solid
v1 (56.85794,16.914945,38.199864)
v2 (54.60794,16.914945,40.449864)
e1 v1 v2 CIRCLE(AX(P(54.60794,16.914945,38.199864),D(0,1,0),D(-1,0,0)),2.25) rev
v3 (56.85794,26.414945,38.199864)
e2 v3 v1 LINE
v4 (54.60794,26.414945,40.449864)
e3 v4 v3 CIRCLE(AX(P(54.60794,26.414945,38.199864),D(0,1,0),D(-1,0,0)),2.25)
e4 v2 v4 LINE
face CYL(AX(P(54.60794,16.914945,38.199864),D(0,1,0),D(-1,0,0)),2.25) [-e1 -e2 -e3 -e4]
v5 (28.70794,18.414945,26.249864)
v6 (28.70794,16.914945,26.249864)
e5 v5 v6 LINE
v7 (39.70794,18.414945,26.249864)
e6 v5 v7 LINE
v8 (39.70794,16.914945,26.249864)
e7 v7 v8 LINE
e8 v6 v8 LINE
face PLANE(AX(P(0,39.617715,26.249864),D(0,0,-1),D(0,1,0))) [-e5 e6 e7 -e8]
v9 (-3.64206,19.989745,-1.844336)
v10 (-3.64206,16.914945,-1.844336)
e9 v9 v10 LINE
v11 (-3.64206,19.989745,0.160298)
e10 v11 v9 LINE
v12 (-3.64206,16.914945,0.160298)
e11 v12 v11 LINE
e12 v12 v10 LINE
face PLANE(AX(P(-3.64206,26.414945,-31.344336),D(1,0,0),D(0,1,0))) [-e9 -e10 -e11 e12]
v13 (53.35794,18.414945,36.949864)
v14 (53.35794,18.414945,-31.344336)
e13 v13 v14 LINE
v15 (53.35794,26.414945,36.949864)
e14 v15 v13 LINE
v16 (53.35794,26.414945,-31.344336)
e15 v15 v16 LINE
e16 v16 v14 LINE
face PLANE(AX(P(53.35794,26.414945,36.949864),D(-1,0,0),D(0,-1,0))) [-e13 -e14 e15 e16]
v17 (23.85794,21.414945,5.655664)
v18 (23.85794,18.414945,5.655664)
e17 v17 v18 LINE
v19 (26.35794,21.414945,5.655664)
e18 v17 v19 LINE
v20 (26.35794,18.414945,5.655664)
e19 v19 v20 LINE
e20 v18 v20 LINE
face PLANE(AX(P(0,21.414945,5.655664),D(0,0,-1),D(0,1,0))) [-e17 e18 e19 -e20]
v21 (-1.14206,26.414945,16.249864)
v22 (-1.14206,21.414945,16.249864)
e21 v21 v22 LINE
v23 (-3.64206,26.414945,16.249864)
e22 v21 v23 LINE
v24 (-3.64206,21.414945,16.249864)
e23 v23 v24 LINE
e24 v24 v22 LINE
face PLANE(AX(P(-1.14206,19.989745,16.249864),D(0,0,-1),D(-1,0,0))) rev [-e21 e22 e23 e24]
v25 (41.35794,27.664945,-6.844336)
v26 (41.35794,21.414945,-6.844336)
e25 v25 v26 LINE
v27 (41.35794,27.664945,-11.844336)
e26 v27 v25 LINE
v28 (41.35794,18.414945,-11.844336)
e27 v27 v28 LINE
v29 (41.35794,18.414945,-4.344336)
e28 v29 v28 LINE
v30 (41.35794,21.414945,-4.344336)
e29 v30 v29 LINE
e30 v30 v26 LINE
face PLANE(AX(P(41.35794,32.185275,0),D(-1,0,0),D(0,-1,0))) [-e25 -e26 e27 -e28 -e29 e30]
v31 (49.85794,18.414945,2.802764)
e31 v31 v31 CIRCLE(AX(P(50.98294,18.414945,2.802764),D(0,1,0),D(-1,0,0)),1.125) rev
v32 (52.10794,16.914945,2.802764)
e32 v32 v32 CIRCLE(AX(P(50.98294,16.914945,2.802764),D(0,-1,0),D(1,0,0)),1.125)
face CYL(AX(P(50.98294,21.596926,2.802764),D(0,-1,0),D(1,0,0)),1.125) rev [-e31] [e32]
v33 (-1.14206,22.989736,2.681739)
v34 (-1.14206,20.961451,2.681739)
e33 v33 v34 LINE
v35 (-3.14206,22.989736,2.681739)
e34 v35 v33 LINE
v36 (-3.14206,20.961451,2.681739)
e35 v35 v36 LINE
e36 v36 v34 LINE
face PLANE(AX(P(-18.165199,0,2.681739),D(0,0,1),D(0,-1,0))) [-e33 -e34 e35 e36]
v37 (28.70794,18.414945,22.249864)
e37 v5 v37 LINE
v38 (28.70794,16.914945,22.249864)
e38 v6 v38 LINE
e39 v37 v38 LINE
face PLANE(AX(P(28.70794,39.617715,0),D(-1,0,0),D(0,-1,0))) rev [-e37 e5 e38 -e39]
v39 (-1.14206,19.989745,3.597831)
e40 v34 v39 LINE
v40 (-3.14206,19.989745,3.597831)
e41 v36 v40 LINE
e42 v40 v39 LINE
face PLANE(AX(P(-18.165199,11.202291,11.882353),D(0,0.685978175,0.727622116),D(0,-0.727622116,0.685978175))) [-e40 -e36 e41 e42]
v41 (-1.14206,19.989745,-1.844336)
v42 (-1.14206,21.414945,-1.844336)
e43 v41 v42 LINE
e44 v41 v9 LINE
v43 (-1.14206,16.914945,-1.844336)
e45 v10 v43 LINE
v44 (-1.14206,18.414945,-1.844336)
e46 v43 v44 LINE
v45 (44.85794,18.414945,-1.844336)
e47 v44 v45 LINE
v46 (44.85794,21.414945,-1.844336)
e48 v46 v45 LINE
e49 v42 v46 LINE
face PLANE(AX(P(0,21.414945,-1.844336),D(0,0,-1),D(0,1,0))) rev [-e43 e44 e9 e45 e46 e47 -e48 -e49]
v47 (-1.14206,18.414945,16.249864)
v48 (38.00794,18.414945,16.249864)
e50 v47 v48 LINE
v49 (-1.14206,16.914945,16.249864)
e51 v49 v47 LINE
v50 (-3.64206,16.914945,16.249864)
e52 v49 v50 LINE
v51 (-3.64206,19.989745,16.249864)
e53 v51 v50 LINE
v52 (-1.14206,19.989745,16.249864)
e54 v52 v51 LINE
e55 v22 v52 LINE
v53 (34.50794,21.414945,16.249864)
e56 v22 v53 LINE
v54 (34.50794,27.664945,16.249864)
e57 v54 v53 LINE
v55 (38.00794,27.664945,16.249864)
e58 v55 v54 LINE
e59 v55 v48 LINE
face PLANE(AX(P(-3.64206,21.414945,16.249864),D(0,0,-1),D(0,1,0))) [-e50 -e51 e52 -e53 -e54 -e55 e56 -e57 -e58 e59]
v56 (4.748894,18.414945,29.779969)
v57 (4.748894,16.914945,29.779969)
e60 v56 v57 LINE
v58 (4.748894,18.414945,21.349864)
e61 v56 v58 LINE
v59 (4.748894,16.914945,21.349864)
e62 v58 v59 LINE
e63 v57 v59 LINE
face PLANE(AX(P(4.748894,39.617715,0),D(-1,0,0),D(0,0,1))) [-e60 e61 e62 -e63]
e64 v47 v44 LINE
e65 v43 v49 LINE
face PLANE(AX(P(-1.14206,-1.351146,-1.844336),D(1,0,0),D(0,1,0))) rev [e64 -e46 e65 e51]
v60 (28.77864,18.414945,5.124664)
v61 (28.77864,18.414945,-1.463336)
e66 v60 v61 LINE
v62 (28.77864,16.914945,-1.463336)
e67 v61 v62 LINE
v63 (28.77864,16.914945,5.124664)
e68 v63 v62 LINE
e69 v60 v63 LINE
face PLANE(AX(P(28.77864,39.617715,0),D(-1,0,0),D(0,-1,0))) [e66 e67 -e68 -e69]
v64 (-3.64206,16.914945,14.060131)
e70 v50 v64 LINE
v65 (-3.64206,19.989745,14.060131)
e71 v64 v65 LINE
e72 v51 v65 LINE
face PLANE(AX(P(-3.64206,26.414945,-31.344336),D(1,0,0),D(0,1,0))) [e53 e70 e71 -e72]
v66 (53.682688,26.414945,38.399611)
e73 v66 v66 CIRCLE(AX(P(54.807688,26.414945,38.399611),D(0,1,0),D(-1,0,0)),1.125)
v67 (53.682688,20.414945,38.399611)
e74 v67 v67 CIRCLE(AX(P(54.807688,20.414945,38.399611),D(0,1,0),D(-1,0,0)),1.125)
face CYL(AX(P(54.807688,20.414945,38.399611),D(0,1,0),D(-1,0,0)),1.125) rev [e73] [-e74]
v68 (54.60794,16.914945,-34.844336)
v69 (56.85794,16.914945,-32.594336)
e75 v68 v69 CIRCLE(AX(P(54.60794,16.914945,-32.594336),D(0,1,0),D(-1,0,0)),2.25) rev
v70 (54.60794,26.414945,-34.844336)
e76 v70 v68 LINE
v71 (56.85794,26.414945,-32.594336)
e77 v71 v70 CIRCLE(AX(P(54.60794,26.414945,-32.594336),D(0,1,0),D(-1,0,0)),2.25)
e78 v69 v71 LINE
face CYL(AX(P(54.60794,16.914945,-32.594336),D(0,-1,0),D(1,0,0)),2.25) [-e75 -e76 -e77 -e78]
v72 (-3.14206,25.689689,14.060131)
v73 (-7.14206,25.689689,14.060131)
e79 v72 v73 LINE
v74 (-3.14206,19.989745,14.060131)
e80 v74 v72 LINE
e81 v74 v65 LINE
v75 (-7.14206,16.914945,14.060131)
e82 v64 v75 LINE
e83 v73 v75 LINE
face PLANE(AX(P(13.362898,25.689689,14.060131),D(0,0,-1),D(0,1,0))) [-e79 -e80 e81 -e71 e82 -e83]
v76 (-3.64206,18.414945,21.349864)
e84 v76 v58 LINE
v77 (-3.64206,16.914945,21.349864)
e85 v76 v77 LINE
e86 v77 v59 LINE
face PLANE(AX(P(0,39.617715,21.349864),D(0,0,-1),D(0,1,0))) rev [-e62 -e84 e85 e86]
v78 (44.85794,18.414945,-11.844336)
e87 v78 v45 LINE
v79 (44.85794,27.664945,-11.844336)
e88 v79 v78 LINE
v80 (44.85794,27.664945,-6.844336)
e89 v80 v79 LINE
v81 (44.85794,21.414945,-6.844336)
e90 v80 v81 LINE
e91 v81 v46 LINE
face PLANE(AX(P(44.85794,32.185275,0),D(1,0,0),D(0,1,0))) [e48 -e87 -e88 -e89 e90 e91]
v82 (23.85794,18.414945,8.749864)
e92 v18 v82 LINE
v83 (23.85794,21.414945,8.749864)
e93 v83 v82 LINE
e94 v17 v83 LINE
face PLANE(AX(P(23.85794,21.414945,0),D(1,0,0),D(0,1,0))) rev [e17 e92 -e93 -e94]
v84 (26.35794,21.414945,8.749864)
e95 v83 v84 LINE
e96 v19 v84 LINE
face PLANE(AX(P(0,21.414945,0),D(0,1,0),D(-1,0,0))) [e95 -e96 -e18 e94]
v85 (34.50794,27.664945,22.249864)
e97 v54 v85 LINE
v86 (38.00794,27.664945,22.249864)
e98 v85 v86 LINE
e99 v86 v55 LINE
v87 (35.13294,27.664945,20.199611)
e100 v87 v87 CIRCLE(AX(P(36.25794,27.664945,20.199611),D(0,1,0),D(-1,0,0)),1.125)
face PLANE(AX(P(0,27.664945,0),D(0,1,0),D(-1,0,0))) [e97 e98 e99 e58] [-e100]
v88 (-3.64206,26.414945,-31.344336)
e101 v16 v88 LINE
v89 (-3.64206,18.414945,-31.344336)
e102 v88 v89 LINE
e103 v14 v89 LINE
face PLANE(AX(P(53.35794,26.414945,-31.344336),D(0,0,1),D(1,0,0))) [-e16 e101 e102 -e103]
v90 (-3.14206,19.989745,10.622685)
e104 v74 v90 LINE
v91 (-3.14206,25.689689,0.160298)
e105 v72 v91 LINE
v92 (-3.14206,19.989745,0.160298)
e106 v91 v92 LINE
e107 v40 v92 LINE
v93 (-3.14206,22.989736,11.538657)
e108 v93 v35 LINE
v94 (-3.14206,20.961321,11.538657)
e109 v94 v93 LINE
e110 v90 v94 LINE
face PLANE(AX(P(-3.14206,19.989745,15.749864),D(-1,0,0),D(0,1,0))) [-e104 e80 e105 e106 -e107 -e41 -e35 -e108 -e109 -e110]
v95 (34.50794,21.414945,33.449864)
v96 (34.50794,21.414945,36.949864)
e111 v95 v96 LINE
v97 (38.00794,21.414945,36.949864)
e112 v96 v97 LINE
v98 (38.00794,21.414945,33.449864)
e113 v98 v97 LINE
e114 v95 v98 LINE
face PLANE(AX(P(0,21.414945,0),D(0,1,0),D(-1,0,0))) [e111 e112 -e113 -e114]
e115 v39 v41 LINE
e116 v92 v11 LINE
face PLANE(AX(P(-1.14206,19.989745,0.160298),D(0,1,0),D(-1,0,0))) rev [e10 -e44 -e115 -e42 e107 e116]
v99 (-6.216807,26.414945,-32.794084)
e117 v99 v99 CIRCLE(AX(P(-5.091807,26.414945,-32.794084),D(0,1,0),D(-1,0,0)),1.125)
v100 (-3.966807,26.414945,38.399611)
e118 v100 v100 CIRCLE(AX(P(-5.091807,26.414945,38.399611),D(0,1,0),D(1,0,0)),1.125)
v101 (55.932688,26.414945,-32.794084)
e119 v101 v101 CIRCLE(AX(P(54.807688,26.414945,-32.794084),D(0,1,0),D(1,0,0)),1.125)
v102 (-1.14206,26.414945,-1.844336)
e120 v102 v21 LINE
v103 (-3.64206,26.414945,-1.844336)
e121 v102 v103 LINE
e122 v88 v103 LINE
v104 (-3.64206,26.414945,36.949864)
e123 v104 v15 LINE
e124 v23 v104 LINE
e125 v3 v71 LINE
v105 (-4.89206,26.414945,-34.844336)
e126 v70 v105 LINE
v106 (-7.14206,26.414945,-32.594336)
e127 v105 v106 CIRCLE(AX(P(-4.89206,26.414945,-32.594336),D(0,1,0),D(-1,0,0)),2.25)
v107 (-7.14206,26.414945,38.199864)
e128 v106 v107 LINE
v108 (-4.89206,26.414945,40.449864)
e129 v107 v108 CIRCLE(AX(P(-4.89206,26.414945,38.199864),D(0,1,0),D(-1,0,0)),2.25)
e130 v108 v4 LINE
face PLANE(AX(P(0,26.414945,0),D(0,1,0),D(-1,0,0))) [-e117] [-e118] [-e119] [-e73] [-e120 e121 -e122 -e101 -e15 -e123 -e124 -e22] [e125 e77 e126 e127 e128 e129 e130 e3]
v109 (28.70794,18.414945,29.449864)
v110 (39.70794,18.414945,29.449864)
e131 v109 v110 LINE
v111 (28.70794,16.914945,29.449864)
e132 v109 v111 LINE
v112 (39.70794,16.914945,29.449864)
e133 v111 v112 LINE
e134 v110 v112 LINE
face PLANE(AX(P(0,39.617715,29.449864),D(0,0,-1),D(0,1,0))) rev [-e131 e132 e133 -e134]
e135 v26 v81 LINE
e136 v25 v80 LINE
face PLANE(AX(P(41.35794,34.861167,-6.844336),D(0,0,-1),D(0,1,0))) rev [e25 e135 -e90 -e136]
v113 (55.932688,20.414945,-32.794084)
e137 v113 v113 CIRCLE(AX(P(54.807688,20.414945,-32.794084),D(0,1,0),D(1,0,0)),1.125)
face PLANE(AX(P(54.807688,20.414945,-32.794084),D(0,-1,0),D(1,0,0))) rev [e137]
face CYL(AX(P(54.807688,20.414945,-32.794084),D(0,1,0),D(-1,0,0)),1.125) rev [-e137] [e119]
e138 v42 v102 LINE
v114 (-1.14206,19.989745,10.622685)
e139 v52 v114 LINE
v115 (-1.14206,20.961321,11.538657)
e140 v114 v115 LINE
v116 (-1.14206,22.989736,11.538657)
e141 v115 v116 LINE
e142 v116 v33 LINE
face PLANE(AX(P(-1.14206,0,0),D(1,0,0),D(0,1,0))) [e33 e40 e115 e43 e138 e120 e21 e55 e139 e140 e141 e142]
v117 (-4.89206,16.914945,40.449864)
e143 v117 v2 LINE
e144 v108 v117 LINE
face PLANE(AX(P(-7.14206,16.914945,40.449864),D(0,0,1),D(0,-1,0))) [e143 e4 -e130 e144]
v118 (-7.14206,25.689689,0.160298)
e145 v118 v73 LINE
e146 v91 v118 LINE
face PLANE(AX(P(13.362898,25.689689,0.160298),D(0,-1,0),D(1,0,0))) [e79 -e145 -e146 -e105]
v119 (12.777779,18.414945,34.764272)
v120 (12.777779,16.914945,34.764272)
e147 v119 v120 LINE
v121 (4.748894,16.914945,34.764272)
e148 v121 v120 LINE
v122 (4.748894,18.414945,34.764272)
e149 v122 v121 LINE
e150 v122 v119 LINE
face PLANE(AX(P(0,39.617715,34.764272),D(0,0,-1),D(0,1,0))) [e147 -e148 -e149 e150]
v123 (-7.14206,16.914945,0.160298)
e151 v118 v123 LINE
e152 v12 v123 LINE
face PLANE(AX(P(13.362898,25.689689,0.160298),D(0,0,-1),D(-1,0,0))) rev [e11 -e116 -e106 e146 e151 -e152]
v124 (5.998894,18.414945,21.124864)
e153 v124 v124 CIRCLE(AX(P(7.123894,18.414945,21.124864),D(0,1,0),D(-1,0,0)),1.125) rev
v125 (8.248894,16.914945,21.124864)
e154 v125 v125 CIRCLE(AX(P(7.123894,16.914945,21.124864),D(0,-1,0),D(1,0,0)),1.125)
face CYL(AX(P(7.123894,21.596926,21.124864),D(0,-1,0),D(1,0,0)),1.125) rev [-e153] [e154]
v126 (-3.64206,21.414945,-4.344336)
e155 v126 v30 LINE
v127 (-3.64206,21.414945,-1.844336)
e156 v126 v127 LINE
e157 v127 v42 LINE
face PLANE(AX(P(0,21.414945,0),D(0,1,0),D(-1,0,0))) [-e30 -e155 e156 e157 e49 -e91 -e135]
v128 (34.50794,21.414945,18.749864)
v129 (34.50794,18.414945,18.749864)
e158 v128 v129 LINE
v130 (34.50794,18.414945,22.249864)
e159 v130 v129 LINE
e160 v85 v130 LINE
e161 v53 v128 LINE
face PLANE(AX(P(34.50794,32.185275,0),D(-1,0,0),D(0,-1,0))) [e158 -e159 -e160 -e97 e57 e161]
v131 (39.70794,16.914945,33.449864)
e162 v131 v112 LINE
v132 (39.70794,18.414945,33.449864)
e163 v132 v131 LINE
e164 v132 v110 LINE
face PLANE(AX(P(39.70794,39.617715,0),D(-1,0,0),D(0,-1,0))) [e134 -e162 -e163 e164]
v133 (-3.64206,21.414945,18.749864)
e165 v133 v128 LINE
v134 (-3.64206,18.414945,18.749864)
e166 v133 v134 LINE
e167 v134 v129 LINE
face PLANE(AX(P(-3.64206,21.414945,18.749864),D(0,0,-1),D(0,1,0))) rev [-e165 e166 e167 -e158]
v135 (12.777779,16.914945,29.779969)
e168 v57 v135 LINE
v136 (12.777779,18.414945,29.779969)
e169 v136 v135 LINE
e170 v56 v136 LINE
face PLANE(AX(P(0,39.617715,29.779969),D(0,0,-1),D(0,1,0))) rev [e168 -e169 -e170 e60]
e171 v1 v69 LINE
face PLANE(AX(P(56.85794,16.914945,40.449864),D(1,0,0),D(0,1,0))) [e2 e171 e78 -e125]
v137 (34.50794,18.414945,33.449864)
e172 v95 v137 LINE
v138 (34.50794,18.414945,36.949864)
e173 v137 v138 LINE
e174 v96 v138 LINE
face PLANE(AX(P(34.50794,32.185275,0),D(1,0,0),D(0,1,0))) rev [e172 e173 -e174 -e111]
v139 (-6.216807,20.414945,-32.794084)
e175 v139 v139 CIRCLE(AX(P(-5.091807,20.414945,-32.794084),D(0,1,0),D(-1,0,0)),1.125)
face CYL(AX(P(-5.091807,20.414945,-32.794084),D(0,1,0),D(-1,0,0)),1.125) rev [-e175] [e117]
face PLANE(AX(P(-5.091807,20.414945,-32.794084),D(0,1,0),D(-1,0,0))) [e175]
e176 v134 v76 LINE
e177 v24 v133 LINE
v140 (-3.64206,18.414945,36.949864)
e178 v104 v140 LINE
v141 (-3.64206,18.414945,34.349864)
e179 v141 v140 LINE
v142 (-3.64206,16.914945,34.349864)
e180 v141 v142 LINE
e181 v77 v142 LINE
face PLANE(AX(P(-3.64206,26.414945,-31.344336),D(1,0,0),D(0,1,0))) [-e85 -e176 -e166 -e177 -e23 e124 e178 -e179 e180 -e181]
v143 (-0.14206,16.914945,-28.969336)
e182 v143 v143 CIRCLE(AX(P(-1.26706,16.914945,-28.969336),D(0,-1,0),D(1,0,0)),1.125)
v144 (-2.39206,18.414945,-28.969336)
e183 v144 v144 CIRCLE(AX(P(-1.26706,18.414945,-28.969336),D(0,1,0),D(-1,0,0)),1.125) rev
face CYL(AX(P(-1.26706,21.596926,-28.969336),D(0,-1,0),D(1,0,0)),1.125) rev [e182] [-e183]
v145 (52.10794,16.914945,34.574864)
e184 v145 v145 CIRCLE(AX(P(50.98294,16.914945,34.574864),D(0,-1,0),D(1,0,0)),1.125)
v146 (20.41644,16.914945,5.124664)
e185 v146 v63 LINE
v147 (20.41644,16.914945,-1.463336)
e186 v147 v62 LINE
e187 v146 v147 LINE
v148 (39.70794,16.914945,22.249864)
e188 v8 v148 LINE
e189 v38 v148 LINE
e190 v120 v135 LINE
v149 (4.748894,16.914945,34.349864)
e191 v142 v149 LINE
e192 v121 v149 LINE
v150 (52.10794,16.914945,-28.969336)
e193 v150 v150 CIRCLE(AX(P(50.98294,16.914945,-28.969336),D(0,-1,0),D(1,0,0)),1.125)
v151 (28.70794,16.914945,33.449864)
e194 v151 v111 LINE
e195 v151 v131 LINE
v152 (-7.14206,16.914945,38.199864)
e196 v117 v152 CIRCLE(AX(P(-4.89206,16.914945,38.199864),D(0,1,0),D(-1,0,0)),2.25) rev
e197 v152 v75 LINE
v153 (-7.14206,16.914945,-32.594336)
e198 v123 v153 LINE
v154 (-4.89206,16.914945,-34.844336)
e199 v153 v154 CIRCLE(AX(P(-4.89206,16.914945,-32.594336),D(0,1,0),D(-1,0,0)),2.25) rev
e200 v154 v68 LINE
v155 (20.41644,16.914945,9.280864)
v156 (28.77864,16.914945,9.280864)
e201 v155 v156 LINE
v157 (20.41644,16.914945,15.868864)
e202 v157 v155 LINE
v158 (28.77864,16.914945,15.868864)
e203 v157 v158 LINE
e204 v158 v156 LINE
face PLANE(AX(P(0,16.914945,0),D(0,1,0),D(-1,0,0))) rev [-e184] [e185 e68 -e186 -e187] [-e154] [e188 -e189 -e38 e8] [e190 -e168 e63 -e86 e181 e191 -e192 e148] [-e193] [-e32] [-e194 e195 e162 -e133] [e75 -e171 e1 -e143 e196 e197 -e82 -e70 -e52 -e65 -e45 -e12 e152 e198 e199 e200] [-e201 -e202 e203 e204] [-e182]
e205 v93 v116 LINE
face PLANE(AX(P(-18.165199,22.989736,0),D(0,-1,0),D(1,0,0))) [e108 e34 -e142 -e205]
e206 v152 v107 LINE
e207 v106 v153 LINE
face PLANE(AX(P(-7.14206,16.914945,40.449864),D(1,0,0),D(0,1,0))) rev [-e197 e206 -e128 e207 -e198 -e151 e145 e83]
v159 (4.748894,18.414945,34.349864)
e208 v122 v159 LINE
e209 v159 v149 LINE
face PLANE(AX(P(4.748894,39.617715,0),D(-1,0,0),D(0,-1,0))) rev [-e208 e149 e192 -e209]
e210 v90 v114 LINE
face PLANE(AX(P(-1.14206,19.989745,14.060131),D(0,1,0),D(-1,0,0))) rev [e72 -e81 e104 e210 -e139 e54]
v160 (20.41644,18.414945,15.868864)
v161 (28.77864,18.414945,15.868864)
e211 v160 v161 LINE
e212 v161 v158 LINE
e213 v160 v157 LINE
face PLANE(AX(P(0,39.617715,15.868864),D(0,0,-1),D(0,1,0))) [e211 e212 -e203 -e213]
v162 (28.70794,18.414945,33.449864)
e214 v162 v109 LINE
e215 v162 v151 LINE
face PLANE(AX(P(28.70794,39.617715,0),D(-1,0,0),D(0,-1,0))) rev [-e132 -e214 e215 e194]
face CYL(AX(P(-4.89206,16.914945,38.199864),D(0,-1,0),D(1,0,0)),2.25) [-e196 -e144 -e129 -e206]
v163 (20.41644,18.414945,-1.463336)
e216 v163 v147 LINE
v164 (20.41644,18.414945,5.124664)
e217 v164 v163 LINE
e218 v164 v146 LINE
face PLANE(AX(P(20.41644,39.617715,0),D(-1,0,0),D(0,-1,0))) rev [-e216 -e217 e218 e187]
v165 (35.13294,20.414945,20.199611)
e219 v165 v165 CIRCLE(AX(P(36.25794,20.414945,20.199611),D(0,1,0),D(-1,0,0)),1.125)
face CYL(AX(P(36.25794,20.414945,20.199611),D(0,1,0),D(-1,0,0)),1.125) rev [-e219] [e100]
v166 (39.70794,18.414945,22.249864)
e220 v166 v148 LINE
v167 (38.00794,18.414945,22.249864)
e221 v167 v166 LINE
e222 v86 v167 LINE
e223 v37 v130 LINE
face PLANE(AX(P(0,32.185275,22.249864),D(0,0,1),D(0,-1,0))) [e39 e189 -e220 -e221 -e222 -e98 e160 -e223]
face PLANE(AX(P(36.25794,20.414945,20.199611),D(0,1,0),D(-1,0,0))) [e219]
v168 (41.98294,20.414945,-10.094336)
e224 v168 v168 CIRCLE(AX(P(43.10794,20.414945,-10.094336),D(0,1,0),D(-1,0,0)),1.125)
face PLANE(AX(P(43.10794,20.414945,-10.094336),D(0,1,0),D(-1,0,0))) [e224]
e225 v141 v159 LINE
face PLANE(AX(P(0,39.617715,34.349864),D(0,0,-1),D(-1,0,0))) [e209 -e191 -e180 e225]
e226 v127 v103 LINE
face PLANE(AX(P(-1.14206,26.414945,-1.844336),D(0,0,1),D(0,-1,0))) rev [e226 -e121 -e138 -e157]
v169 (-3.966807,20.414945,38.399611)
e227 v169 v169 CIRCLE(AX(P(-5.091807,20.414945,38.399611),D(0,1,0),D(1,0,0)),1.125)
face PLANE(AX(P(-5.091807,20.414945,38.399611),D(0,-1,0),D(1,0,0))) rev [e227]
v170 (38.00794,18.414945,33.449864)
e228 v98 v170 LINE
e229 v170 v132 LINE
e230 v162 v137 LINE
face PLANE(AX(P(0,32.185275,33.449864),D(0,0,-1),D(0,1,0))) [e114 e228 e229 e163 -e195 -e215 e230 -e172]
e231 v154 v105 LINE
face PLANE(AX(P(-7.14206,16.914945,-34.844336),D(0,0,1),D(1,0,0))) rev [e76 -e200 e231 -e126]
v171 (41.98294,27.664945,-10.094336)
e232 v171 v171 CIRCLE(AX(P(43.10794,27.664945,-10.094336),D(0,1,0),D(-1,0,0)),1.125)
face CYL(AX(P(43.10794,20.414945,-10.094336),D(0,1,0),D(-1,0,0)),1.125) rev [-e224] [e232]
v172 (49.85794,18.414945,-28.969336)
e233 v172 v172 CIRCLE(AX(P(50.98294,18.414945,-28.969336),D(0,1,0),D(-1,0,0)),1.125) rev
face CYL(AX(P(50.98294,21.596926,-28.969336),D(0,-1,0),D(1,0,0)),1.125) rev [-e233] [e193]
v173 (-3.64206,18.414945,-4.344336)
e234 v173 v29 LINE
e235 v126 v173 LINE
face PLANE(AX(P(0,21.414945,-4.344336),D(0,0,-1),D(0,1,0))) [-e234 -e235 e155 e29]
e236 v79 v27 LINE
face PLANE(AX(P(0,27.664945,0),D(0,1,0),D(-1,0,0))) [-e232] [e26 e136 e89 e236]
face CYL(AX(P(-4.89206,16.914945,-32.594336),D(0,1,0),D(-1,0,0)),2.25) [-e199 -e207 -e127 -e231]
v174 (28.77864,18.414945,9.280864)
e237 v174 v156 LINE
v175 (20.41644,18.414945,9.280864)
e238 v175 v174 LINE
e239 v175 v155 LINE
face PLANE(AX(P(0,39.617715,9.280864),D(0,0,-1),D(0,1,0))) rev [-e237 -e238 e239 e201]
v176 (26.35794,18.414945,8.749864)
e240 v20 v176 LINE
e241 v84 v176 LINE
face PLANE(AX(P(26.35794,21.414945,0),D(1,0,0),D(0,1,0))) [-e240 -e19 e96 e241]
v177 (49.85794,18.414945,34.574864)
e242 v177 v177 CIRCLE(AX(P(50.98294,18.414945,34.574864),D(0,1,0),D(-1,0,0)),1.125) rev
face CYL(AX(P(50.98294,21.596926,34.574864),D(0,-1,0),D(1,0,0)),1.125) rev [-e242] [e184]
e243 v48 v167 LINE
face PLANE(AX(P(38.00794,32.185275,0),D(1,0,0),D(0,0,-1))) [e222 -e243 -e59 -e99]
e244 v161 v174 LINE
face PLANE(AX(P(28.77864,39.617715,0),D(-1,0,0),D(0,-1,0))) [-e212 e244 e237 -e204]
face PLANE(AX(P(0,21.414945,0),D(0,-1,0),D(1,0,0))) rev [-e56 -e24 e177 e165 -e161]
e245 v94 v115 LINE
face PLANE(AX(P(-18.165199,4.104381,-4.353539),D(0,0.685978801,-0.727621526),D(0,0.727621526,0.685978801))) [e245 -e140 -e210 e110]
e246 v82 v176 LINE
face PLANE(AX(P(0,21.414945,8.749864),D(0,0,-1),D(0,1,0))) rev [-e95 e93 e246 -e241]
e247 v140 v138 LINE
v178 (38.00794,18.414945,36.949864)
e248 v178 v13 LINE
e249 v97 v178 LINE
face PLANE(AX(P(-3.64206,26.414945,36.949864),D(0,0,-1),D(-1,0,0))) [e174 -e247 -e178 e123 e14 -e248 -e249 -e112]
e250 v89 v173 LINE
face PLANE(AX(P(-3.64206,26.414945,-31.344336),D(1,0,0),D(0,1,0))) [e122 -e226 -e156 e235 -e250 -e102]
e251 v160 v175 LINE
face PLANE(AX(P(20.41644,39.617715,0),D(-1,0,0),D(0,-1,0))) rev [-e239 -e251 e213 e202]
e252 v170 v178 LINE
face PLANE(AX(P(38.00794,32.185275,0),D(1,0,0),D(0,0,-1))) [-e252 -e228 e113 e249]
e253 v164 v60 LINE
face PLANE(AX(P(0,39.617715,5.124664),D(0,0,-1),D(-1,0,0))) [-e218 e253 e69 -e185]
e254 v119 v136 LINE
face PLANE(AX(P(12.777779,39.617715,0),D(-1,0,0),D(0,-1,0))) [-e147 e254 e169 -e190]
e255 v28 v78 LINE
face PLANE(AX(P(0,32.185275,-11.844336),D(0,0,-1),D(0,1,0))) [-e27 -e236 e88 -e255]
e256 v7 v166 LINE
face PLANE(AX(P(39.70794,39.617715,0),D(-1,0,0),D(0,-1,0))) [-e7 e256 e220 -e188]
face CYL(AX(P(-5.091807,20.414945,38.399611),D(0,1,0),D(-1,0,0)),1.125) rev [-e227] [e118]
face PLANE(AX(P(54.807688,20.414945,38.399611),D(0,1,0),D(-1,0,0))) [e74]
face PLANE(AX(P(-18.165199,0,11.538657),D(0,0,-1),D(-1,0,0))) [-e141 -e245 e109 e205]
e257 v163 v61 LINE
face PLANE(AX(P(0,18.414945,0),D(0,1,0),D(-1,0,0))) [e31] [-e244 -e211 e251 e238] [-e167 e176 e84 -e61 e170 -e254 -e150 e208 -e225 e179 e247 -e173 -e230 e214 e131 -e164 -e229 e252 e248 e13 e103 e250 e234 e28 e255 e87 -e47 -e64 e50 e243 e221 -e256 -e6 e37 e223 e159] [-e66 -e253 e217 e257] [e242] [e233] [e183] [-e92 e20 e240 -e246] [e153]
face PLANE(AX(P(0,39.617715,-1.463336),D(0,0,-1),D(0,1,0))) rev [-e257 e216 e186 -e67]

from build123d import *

# Parameters (mm, degrees)
SKETCH2_W              = 64
SKETCH2_H              = 75.2942
BASE_DEPTH             = 1.5
SKETCH6_W              = 64
SKETCH6_H              = 75.2942
SKETCH6_W_2            = 57
SKETCH6_H_2            = 68.2942
OUTSIDE_WALLS_DEPTH    = 8
SKETCH3_W              = 44.5
SKETCH3_H              = 2.5
SKETCH3_W_2            = 37.65
DIVIDER_WALLS_DEPTH    = 3
USB_START              = 0.160298289
USB_HOLE_DEPTH         = 13.899833209
SKETCH10_W             = 3.5
SKETCH10_H             = 3.5
BATT_MT3608_STOP_DEPTH = 3
TP4056_START           = 18.414945084
TP4056_STOP_OUTLINE_W  = 2.5
TP4056_STOP_OUTLINE_H  = 3.0942
TP4056_STOP_DEPTH      = 3
WIRE_START             = 20.416440404
WIRE_HOLES_OUTLINE_W   = 1.5
WIRE_HOLES_OUTLINE_H   = 6.588
WIRE_HOLES_DEPTH       = 8.3622
WIRE_START_2           = -3.642059596
WIRE_HOLES_2_OUTLINE_W = 1.5
WIRE_HOLES_2_OUTLINE_H = 13
WIRE_HOLES_2_DEPTH     = 8.390953786
WIRE_START_3           = 28.707940404
WIRE_HOLES_3_OUTLINE_W = 1.5
WIRE_HOLES_3_OUTLINE_H = 4
WIRE_HOLES_3_DEPTH     = 11
WIRE_START_4           = 4.74889419
WIRE_HOLES_4_OUTLINE_W = 1.5
WIRE_HOLES_4_OUTLINE_H = 4.98430333
WIRE_HOLES_4_DEPTH     = 8.028885191
USB_HOOD_DEPTH         = 2.5
USB_BACKING_DEPTH      = 2
SKETCH19_W             = 2.5
SKETCH19_H             = 18.0942
CUT_EXTRUDE2_DEPTH     = 1.5
SKETCH16_R             = 1.125
SCREW_HOLES_DEPTH      = 6
FILLET1_R              = 2.25
BOSS_EXTRUDE3_START    = 6.25
SKETCH17_W             = 3.5
SKETCH17_H             = 6
SKETCH17_R             = 1.125
SKETCH17_H_2           = 5
BOSS_EXTRUDE3_DEPTH    = 6.25
SKETCH18_R             = 1.125
CUT_EXTRUDE1_DEPTH     = 1.5


# Read off the part's stored shape, not the designer's step: USB Hole, TP4056 Stop, Wire Holes
with BuildPart() as part:
    # Sketch2 → Base (new body)
    with BuildSketch(Plane.XZ.offset(-18.414945084)):
        with Locations((24.857940404, 2.802763775)):
            Rectangle(SKETCH2_W, SKETCH2_H)
    extrude(amount=BASE_DEPTH)

    # Sketch6 → Outside Walls (add)
    with BuildSketch(Plane(origin=(0, 18.414945084, 0), x_dir=(1, 0, 0), z_dir=(0, 1, 0))):
        with Locations((24.857940404, -2.802763775)):
            Rectangle(SKETCH6_W, SKETCH6_H)
        with Locations((24.857940404, -2.802763775)):
            Rectangle(SKETCH6_W_2, SKETCH6_H_2, mode=Mode.SUBTRACT)
    extrude(amount=OUTSIDE_WALLS_DEPTH)

    # Sketch3 → Divider Walls (add)
    with BuildSketch(Plane(origin=(0, 18.414945084, 0), x_dir=(1, 0, 0), z_dir=(0, 1, 0))):
        with Locations((18.607940404, 3.094336225)):
            Rectangle(SKETCH3_W, SKETCH3_H)
        with Locations((15.182940404, -17.499863775)):
            Rectangle(SKETCH3_W_2, SKETCH3_H)
    extrude(amount=DIVIDER_WALLS_DEPTH)

    # USB Hole outline → USB Hole (cut)
    with BuildSketch(Plane.XY.offset(USB_START)):
        Polygon((-3.142059596, 16.914945084), (-3.142059596, 18.414945084), (-3.642059596, 18.414945084), (-3.642059596, 25.689688961), (-7.142059596, 25.689688961), (-7.142059596, 16.914945084), align=None)
    extrude(amount=USB_HOLE_DEPTH, mode=Mode.SUBTRACT)

    # Sketch10 → Batt & MT3608 Stop (add)
    with BuildSketch(Plane(origin=(0, 18.414945084, 0), x_dir=(1, 0, 0), z_dir=(0, 1, 0))):
        Polygon((44.857940404, 1.844336225), (40.857940404, 1.844336225), (40.857940404, 4.344336225), (41.357940404, 4.344336225), (41.357940404, 11.844336225), (44.857940404, 11.844336225), align=None)
        Polygon((34.507940404, -18.749863775), (34.007940404, -18.749863775), (34.007940404, -16.249863775), (38.007940404, -16.249863775), (38.007940404, -22.249863775), (34.507940404, -22.249863775), align=None)
        with Locations((36.257940404, -35.199863775)):
            Rectangle(SKETCH10_W, SKETCH10_H)
    extrude(amount=BATT_MT3608_STOP_DEPTH)

    # TP4056 Stop outline → TP4056 Stop (add)
    with BuildSketch(Plane(origin=(0, 0, 0), x_dir=(1, 0, 0), z_dir=(0, 1, 0)).offset(TP4056_START)):
        with Locations((25.107940404, -7.202763775)):
            Rectangle(TP4056_STOP_OUTLINE_W, TP4056_STOP_OUTLINE_H)
    extrude(amount=TP4056_STOP_DEPTH)

    # Wire Holes outline → Wire Holes (cut)
    with BuildSketch(Plane.YZ.offset(WIRE_START)):
        with Locations((17.664945084, 12.574863775)):
            Rectangle(WIRE_HOLES_OUTLINE_W, WIRE_HOLES_OUTLINE_H)
        with Locations((17.664945084, 1.830663775)):
            Rectangle(WIRE_HOLES_OUTLINE_W, WIRE_HOLES_OUTLINE_H)
    extrude(amount=WIRE_HOLES_DEPTH, mode=Mode.SUBTRACT)

    # Wire Holes 2 outline → Wire Holes 2 (cut)
    with BuildSketch(Plane.YZ.offset(WIRE_START_2)):
        with Locations((17.664945084, 27.849863775)):
            Rectangle(WIRE_HOLES_2_OUTLINE_W, WIRE_HOLES_2_OUTLINE_H)
    extrude(amount=WIRE_HOLES_2_DEPTH, mode=Mode.SUBTRACT)

    # Wire Holes 3 outline → Wire Holes 3 (cut)
    with BuildSketch(Plane.YZ.offset(WIRE_START_3)):
        with Locations((17.664945084, 24.249863775)):
            Rectangle(WIRE_HOLES_3_OUTLINE_W, WIRE_HOLES_3_OUTLINE_H)
        with Locations((17.664945084, 31.449863775)):
            Rectangle(WIRE_HOLES_3_OUTLINE_W, WIRE_HOLES_3_OUTLINE_H)
    extrude(amount=WIRE_HOLES_3_DEPTH, mode=Mode.SUBTRACT)

    # Wire Holes 4 outline → Wire Holes 4 (cut)
    with BuildSketch(Plane.YZ.offset(WIRE_START_4)):
        with Locations((17.664945084, 32.272120623)):
            Rectangle(WIRE_HOLES_4_OUTLINE_W, WIRE_HOLES_4_OUTLINE_H)
    extrude(amount=WIRE_HOLES_4_DEPTH, mode=Mode.SUBTRACT)

    # Sketch14 → USB Hood (add)
    with BuildSketch(Plane(origin=(-3.642059596, 0, 0), x_dir=(0, 0, -1), z_dir=(1, 0, 0))):
        Polygon((-14.060131498, 19.989745084), (-14.060131498, 25.689688961), (-0.160298289, 25.689688961), (-0.160298289, 19.989745084), (1.844336225, 19.989745084), (1.844336225, 26.414945084), (-16.249863775, 26.414945084), (-16.249863775, 19.989745084), align=None)
    extrude(amount=USB_HOOD_DEPTH)

    # Sketch15 → USB Backing (add)
    with BuildSketch(Plane(origin=(-1.142059596, 0, 0), x_dir=(0, 0, -1), z_dir=(1, 0, 0))):
        Polygon((-2.681738903, 22.989735785), (-2.681738903, 20.961450556), (-3.59783083, 19.989745084), (-0.160298289, 19.989745084), (-0.160298289, 25.689688961), (-14.060131498, 25.689688961), (-14.060131498, 19.989745084), (-10.622685302, 19.989745084), (-11.538656584, 20.961320912), (-11.538656584, 22.989735785), align=None)
    extrude(amount=-USB_BACKING_DEPTH)

    # Sketch19 → Cut-Extrude2 (cut)
    with BuildSketch(Plane(origin=(0, 18.414945084, 0), x_dir=(1, 0, 0), z_dir=(0, 1, 0))):
        with Locations((-2.392059596, -7.202763775)):
            Rectangle(SKETCH19_W, SKETCH19_H)
    extrude(amount=-CUT_EXTRUDE2_DEPTH, mode=Mode.SUBTRACT)

    # Sketch16 → Screw Holes (cut)
    with BuildSketch(Plane(origin=(0, 26.414945084, 0), x_dir=(1, 0, 0), z_dir=(0, 1, 0))):
        with Locations(Location((-5.091807064, 32.794083694, 0), (0, 0, 180))):
            Circle(SKETCH16_R)
        with Locations((54.807687872, 32.794083694)):
            Circle(SKETCH16_R)
        with Locations((-5.091807064, -38.399611243)):
            Circle(SKETCH16_R)
        with Locations(Location((54.807687872, -38.399611243, 0), (0, 0, 180))):
            Circle(SKETCH16_R)
        with Locations(Location((43.107940404, 10.094336225, 0), (0, 0, 180))):
            Circle(SKETCH16_R)
        with Locations(Location((36.257940404, -20.199611243, 0), (0, 0, 180))):
            Circle(SKETCH16_R)
    extrude(amount=-SCREW_HOLES_DEPTH, mode=Mode.SUBTRACT)

    # Fillet1
    fillet1_edges = [part.edges().sort_by_distance(p)[0] for p in [
        (-7.142059596, 21.664945084, 40.449863775),
        (-7.142059596, 21.664945084, -34.844336225),
        (56.857940404, 21.664945084, -34.844336225),
        (56.857940404, 21.664945084, 40.449863775),
    ]]
    fillet(fillet1_edges, radius=FILLET1_R)

    # Sketch17 → Boss-Extrude3 (add)
    # profile 1 of 2: a face of its own
    with BuildSketch(Plane(origin=(0, 21.414945084, 0), x_dir=(1, 0, 0), z_dir=(0, 1, 0)).offset(BOSS_EXTRUDE3_START)):
        with Locations((36.257940404, -19.249863775)):
            Rectangle(SKETCH17_W, SKETCH17_H)
        with Locations(Location((36.257940404, -20.199611243, 0), (0, 0, 180))):
            Circle(SKETCH17_R, mode=Mode.SUBTRACT)
    # profile 2 of 2: a face of its own
    with BuildSketch(Plane(origin=(0, 21.414945084, 0), x_dir=(1, 0, 0), z_dir=(0, 1, 0)).offset(BOSS_EXTRUDE3_START)):
        with Locations((43.107940404, 9.344336225)):
            Rectangle(SKETCH17_W, SKETCH17_H_2)
        with Locations(Location((43.107940404, 10.094336225, 0), (0, 0, 180))):
            Circle(SKETCH17_R, mode=Mode.SUBTRACT)
    extrude(amount=-BOSS_EXTRUDE3_DEPTH)

    # Sketch18 → Cut-Extrude1 (cut)
    with BuildSketch(Plane.XZ.offset(-16.914945084)):
        with Locations((50.982940404, 34.574863775)):
            Circle(SKETCH18_R)
        with Locations((50.982940404, 2.802763775)):
            Circle(SKETCH18_R)
        with Locations((50.982940404, -28.969336225)):
            Circle(SKETCH18_R)
        with Locations((-1.267059596, -28.969336225)):
            Circle(SKETCH18_R)
        with Locations((7.12389419, 21.124863775)):
            Circle(SKETCH18_R)
    extrude(amount=-CUT_EXTRUDE1_DEPTH, mode=Mode.SUBTRACT)


solid = part.part
